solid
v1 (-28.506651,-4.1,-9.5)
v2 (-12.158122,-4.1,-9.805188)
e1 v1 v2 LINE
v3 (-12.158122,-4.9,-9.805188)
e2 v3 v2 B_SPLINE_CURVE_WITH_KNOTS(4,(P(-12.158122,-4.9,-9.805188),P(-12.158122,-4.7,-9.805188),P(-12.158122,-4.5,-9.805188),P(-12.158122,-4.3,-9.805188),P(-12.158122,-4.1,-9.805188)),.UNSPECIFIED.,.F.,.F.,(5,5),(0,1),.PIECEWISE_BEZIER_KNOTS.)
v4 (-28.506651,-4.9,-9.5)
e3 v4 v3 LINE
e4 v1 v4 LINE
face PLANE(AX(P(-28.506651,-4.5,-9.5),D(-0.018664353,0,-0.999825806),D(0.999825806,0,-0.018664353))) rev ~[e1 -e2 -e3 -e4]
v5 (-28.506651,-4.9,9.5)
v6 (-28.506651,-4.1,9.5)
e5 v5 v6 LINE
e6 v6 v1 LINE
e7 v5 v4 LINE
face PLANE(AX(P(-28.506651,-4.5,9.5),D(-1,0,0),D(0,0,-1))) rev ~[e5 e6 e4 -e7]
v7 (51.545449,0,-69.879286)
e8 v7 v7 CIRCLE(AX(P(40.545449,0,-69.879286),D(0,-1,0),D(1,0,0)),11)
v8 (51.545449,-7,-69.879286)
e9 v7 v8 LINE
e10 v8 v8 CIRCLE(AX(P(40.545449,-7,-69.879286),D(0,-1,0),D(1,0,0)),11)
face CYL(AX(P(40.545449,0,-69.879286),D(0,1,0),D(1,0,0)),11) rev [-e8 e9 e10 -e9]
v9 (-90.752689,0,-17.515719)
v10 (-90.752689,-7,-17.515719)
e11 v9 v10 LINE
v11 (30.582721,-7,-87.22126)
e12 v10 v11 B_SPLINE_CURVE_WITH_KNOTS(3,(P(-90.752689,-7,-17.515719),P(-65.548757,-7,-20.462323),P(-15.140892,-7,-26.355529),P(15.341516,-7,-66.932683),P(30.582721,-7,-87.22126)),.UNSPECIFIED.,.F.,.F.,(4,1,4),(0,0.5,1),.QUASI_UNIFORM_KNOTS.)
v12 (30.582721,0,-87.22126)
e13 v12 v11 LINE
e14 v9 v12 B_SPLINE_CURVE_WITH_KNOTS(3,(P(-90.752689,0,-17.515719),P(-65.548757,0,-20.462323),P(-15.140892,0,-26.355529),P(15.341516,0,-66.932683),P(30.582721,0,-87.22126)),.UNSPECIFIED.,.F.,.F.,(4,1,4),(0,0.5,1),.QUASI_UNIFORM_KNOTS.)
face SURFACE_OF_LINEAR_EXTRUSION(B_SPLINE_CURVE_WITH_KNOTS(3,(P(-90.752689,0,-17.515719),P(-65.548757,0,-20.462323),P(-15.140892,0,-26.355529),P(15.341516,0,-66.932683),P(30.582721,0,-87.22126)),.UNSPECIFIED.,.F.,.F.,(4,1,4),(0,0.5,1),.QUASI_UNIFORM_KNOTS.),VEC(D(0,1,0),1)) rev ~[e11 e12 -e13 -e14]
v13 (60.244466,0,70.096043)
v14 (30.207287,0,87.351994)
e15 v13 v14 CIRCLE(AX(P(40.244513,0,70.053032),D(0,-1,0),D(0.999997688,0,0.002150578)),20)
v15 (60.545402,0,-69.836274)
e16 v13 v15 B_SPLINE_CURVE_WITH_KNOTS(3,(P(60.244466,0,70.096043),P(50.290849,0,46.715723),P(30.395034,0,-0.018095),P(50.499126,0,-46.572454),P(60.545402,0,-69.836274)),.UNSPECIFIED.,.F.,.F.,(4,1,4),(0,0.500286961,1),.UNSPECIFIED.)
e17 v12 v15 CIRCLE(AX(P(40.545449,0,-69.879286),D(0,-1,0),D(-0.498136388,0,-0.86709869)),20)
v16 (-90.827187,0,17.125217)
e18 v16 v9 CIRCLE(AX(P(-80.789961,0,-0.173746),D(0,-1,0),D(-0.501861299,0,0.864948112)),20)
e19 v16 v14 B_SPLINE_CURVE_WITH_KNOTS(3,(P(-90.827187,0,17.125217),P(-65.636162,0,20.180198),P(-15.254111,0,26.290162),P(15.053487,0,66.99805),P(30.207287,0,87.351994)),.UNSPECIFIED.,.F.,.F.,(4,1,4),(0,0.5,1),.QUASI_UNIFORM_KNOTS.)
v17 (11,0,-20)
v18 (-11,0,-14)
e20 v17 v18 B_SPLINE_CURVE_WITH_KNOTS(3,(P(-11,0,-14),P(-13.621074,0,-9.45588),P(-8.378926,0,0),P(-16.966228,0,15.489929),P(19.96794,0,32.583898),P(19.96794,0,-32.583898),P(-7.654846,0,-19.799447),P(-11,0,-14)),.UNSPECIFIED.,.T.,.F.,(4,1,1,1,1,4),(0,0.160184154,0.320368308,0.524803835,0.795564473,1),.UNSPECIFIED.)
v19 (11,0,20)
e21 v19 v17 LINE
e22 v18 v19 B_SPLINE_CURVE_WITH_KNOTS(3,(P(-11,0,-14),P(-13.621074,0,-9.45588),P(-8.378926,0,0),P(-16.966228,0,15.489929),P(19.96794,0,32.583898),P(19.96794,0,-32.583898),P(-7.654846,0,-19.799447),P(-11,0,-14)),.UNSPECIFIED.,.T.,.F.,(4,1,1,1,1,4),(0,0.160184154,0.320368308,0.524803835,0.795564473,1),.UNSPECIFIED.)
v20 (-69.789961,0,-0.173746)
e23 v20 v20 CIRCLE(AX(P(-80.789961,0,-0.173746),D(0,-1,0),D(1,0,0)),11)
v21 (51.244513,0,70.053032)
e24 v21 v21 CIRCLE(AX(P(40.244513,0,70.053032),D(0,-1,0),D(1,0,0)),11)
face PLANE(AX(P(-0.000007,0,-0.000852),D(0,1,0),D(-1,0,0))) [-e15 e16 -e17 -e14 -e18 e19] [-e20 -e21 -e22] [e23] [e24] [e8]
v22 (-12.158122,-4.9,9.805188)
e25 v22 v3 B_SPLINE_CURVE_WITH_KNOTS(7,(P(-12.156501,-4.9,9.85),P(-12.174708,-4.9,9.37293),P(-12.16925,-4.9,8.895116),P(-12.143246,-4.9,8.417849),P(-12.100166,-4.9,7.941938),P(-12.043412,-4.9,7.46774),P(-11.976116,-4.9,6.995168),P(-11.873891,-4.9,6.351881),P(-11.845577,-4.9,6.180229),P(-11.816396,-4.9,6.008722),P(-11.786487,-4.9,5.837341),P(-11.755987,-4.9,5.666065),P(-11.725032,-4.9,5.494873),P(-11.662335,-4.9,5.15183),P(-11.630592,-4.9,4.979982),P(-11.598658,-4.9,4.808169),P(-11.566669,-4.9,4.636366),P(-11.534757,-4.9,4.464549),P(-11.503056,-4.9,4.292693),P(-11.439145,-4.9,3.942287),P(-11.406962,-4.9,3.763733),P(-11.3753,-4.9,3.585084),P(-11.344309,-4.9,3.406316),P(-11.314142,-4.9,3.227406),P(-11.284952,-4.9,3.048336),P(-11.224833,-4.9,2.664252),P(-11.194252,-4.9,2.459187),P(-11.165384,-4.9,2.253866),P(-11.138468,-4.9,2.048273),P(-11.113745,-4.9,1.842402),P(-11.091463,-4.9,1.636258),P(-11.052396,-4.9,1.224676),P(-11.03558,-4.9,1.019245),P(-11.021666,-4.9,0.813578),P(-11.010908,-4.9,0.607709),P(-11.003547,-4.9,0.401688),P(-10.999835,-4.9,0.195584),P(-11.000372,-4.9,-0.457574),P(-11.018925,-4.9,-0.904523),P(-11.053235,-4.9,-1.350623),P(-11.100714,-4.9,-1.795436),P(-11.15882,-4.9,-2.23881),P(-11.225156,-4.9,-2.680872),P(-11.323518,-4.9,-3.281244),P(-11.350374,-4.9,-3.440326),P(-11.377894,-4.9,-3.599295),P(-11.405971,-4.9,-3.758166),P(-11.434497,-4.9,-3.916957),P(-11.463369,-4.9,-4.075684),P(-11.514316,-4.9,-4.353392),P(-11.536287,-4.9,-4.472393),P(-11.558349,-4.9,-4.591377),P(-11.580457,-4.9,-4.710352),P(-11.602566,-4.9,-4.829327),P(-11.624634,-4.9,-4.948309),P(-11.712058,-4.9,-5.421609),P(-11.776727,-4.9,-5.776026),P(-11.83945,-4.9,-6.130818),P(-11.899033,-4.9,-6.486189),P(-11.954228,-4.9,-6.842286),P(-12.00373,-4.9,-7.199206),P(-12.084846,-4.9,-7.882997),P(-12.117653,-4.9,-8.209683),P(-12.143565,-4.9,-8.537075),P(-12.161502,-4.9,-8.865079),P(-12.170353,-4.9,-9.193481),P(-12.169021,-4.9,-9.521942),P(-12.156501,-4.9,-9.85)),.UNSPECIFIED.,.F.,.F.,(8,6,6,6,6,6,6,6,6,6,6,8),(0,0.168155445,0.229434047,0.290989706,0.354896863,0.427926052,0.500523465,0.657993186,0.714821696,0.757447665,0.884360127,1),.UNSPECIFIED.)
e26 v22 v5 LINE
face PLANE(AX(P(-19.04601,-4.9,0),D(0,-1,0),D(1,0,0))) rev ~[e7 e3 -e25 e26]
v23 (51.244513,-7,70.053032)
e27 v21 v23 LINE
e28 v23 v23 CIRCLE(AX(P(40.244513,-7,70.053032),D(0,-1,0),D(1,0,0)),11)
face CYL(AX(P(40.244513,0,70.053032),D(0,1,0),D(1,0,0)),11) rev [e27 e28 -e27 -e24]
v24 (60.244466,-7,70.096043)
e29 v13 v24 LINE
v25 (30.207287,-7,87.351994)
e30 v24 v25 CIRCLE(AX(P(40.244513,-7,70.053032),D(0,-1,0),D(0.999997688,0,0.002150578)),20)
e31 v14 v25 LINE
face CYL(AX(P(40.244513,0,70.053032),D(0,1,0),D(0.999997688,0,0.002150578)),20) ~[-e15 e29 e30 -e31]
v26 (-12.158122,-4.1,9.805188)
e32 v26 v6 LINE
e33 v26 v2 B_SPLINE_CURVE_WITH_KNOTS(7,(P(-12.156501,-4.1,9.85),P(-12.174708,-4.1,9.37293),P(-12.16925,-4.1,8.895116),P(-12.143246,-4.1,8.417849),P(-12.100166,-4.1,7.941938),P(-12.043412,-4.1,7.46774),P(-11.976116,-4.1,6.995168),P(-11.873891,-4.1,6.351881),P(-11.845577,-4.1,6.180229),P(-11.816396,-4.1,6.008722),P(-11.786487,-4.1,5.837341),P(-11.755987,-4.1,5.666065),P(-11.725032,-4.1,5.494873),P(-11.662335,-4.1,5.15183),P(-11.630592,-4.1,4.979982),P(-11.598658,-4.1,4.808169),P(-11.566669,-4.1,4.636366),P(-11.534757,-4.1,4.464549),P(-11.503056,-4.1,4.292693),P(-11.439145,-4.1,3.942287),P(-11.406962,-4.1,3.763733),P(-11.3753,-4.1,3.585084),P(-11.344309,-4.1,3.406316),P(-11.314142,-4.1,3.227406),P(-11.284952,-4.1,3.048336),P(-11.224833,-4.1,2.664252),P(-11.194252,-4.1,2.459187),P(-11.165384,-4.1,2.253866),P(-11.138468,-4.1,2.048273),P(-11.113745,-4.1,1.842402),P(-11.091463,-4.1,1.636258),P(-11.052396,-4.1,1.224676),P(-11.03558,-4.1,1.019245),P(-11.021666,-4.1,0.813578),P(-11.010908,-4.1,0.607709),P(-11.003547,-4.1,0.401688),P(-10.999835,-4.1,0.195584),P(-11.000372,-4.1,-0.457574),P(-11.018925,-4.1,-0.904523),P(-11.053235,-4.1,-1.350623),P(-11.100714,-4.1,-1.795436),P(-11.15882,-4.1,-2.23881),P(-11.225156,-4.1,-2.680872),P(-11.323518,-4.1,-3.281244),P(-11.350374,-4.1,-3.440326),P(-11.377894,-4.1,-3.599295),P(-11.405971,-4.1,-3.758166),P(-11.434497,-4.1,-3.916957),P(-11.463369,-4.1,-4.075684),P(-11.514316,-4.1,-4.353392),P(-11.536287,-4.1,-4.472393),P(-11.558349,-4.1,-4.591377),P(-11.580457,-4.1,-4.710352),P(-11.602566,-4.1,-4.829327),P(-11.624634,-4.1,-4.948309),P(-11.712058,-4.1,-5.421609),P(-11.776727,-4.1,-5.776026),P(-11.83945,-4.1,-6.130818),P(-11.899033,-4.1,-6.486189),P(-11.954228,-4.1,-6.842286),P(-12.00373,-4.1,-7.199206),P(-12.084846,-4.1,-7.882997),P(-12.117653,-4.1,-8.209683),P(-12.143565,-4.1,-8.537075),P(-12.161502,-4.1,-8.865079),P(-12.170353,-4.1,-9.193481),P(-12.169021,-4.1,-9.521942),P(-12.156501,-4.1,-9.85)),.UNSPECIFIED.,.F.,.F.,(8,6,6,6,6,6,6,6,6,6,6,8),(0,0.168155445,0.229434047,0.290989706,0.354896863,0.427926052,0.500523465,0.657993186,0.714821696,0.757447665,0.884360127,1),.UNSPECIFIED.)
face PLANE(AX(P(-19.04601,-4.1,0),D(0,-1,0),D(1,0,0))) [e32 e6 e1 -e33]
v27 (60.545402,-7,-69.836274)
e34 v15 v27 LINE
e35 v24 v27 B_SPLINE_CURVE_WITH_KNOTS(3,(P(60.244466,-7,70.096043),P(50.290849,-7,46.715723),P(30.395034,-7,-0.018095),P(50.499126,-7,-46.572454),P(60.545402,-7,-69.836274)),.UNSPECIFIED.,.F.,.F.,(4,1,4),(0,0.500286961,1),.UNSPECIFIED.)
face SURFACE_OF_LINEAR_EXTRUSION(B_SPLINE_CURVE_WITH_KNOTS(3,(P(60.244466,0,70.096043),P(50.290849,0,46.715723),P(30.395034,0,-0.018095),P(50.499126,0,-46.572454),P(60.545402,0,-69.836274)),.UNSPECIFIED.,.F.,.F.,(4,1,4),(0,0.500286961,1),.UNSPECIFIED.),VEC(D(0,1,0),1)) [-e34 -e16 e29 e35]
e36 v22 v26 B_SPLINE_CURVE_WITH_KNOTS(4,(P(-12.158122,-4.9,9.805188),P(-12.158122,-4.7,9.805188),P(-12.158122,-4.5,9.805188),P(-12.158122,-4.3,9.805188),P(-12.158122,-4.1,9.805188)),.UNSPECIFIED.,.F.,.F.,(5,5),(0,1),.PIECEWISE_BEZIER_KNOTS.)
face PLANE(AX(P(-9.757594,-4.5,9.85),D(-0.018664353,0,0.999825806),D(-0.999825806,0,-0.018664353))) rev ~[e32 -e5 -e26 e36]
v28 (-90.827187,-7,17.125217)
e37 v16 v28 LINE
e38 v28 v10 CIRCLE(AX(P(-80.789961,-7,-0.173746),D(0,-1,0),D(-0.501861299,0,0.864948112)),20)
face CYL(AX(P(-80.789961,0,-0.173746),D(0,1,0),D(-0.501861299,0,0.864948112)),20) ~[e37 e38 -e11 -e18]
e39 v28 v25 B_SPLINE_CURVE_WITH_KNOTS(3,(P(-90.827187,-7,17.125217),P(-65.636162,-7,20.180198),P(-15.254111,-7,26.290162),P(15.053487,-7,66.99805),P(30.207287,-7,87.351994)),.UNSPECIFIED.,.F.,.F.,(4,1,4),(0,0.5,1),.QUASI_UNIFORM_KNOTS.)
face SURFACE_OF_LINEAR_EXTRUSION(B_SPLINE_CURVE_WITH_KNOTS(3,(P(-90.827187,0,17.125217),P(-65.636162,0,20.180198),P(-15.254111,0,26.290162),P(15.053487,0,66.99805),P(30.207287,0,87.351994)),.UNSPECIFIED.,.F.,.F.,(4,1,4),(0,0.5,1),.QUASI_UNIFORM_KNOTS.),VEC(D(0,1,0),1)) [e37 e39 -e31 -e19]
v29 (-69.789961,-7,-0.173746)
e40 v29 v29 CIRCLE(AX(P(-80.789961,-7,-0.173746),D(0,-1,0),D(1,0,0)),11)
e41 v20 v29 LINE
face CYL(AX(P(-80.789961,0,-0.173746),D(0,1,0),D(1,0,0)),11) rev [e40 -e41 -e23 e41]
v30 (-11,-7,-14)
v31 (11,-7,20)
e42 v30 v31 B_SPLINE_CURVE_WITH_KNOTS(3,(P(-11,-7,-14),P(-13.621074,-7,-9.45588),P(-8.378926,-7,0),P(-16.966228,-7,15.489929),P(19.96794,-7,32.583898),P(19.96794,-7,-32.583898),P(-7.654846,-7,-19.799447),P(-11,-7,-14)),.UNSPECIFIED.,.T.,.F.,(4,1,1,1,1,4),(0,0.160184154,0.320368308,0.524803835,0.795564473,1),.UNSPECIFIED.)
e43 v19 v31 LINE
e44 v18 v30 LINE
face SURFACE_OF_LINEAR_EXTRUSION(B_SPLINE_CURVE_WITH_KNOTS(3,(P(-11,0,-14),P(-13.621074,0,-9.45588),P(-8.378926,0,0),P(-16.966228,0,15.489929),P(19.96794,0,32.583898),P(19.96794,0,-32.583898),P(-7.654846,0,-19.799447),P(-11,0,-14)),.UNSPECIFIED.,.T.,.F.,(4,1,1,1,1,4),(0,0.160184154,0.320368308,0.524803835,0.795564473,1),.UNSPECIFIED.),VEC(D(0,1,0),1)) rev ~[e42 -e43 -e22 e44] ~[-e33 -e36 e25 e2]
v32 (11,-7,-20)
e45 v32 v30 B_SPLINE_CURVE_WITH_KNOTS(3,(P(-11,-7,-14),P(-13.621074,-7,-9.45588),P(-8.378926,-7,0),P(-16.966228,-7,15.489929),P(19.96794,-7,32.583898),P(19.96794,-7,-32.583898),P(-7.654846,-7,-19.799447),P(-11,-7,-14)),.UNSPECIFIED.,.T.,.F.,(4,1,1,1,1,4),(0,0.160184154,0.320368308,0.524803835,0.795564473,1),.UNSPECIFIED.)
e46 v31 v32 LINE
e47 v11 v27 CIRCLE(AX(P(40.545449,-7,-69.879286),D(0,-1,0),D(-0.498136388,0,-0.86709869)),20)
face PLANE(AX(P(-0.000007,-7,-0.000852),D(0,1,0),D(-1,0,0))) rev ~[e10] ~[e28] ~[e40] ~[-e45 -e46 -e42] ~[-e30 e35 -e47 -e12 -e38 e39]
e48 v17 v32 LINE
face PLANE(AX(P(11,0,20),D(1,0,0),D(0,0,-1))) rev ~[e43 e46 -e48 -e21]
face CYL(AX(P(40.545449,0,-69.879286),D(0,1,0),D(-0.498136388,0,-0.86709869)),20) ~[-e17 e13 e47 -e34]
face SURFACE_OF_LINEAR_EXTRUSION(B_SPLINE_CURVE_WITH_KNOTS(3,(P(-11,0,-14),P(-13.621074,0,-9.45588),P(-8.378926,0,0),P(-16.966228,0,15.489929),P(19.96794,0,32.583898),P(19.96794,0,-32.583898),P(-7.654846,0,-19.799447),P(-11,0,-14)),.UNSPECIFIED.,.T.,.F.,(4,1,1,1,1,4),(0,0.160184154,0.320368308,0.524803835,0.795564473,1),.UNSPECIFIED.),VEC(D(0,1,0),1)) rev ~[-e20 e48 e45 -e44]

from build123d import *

# Parameters (mm, degrees)
F0_R     = 11
F1_DEPTH = 7
F4_DEPTH = 0.4


with BuildPart() as f1:
    # F0 (on Front) → F1 (new body)
    with BuildSketch(Plane.XZ):
        with BuildLine():
            add(Edge.make_bspline(
                [(-90.8271871838, 17.1252166849), (-65.6361619016, 20.1801984156), (-15.2541113371, 26.2901618769), (15.053487254, 66.9980498131), (30.2072865496, 87.3519937812)],
                knots=[0, 0, 0, 0, 0.5, 1, 1, 1, 1], degree=3))
            ThreePointArc((-90.8271871838, 17.1252166849), (-100.7899149472, -0.2167571218), (-90.7526889605, -17.5157193593))
            add(Edge.make_bspline(
                [(-90.7526889605, -17.5157193593), (-65.5487567691, -20.462322529), (-15.1408923865, -26.3555288685), (15.3415164695, -66.9326828214), (30.5827208975, -87.2212597979)],
                knots=[0, 0, 0, 0, 0.5, 1, 1, 1, 1], degree=3))
            ThreePointArc((30.5827208975, -87.2212597979), (50.5826746476, -87.1782482286), (60.5454024109, -69.8362744219))
            add(Edge.make_bspline(
                [(60.2444662863, 70.096043113), (50.2908494103, 46.7157233653), (30.3950343103, -0.0180945494), (50.4991257729, -46.5724539929), (60.5454024109, -69.8362744219)],
                knots=[0, 0, 0, 0, 0.5002869612, 1, 1, 1, 1], degree=3))
            ThreePointArc((60.2444662863, 70.096043113), (50.2072402996, 87.3950053505), (30.2072865496, 87.3519937812))
        make_face()
        with Locations((-80.7899611971, -0.1737455525)):
            Circle(F0_R, mode=Mode.SUBTRACT)
        with Locations((40.5454486609, -69.8792859912)):
            Circle(F0_R, mode=Mode.SUBTRACT)
        with BuildLine():
            add(Edge.make_bspline(
                [(-11, -14), (-13.6210738364, -9.4558803164), (-8.3789261636, 0), (-16.9662275077, 15.4899287121), (4.2288329874, 25.2994830421), (11, 20)],
                knots=[0, 0, 0, 0, 0.1601841539, 0.3203683079, 0.5248038347, 0.5248038347, 0.5248038347, 0.5248038347], degree=3))
            add(Edge.make_bspline(
                [(11, 20), (19.9679398291, 12.9812032463), (19.9679398291, -12.9812032463), (11, -20)],
                knots=[0.5248038347, 0.5248038347, 0.5248038347, 0.5248038347, 0.7955644732, 0.7955644732, 0.7955644732, 0.7955644732], degree=3))
            add(Edge.make_bspline(
                [(11, -20), (4.2288329874, -25.2994830421), (-7.6548463287, -19.7994469409), (-11, -14)],
                knots=[0.7955644732, 0.7955644732, 0.7955644732, 0.7955644732, 1, 1, 1, 1], degree=3))
        make_face(mode=Mode.SUBTRACT)
        with Locations((40.2445125363, 70.0530315437)):
            Circle(F0_R, mode=Mode.SUBTRACT)
        with BuildLine():
            Line((11, 20), (11, 0))
            Line((11, 0), (11, -20))
            add(Edge.make_bspline(
                [(11, 20), (19.9679398291, 12.9812032463), (19.9679398291, -12.9812032463), (11, -20)],
                knots=[0.5248038347, 0.5248038347, 0.5248038347, 0.5248038347, 0.7955644732, 0.7955644732, 0.7955644732, 0.7955644732], degree=3))
        make_face()
    extrude(amount=F1_DEPTH)

    # F3 (on offset) → F4 (cut, symmetric)
    with BuildSketch(Plane.XZ.offset(4.5)):
        Polygon((-28.5066514462, 9.5), (-28.5066514462, 0), (-28.5066514462, -9.5), (-9.7575942054, -9.85), (-9.7575942054, 0), (-9.7575942054, 9.85), align=None)
    extrude(amount=F4_DEPTH, both=True, mode=Mode.SUBTRACT)


solid = f1.part
